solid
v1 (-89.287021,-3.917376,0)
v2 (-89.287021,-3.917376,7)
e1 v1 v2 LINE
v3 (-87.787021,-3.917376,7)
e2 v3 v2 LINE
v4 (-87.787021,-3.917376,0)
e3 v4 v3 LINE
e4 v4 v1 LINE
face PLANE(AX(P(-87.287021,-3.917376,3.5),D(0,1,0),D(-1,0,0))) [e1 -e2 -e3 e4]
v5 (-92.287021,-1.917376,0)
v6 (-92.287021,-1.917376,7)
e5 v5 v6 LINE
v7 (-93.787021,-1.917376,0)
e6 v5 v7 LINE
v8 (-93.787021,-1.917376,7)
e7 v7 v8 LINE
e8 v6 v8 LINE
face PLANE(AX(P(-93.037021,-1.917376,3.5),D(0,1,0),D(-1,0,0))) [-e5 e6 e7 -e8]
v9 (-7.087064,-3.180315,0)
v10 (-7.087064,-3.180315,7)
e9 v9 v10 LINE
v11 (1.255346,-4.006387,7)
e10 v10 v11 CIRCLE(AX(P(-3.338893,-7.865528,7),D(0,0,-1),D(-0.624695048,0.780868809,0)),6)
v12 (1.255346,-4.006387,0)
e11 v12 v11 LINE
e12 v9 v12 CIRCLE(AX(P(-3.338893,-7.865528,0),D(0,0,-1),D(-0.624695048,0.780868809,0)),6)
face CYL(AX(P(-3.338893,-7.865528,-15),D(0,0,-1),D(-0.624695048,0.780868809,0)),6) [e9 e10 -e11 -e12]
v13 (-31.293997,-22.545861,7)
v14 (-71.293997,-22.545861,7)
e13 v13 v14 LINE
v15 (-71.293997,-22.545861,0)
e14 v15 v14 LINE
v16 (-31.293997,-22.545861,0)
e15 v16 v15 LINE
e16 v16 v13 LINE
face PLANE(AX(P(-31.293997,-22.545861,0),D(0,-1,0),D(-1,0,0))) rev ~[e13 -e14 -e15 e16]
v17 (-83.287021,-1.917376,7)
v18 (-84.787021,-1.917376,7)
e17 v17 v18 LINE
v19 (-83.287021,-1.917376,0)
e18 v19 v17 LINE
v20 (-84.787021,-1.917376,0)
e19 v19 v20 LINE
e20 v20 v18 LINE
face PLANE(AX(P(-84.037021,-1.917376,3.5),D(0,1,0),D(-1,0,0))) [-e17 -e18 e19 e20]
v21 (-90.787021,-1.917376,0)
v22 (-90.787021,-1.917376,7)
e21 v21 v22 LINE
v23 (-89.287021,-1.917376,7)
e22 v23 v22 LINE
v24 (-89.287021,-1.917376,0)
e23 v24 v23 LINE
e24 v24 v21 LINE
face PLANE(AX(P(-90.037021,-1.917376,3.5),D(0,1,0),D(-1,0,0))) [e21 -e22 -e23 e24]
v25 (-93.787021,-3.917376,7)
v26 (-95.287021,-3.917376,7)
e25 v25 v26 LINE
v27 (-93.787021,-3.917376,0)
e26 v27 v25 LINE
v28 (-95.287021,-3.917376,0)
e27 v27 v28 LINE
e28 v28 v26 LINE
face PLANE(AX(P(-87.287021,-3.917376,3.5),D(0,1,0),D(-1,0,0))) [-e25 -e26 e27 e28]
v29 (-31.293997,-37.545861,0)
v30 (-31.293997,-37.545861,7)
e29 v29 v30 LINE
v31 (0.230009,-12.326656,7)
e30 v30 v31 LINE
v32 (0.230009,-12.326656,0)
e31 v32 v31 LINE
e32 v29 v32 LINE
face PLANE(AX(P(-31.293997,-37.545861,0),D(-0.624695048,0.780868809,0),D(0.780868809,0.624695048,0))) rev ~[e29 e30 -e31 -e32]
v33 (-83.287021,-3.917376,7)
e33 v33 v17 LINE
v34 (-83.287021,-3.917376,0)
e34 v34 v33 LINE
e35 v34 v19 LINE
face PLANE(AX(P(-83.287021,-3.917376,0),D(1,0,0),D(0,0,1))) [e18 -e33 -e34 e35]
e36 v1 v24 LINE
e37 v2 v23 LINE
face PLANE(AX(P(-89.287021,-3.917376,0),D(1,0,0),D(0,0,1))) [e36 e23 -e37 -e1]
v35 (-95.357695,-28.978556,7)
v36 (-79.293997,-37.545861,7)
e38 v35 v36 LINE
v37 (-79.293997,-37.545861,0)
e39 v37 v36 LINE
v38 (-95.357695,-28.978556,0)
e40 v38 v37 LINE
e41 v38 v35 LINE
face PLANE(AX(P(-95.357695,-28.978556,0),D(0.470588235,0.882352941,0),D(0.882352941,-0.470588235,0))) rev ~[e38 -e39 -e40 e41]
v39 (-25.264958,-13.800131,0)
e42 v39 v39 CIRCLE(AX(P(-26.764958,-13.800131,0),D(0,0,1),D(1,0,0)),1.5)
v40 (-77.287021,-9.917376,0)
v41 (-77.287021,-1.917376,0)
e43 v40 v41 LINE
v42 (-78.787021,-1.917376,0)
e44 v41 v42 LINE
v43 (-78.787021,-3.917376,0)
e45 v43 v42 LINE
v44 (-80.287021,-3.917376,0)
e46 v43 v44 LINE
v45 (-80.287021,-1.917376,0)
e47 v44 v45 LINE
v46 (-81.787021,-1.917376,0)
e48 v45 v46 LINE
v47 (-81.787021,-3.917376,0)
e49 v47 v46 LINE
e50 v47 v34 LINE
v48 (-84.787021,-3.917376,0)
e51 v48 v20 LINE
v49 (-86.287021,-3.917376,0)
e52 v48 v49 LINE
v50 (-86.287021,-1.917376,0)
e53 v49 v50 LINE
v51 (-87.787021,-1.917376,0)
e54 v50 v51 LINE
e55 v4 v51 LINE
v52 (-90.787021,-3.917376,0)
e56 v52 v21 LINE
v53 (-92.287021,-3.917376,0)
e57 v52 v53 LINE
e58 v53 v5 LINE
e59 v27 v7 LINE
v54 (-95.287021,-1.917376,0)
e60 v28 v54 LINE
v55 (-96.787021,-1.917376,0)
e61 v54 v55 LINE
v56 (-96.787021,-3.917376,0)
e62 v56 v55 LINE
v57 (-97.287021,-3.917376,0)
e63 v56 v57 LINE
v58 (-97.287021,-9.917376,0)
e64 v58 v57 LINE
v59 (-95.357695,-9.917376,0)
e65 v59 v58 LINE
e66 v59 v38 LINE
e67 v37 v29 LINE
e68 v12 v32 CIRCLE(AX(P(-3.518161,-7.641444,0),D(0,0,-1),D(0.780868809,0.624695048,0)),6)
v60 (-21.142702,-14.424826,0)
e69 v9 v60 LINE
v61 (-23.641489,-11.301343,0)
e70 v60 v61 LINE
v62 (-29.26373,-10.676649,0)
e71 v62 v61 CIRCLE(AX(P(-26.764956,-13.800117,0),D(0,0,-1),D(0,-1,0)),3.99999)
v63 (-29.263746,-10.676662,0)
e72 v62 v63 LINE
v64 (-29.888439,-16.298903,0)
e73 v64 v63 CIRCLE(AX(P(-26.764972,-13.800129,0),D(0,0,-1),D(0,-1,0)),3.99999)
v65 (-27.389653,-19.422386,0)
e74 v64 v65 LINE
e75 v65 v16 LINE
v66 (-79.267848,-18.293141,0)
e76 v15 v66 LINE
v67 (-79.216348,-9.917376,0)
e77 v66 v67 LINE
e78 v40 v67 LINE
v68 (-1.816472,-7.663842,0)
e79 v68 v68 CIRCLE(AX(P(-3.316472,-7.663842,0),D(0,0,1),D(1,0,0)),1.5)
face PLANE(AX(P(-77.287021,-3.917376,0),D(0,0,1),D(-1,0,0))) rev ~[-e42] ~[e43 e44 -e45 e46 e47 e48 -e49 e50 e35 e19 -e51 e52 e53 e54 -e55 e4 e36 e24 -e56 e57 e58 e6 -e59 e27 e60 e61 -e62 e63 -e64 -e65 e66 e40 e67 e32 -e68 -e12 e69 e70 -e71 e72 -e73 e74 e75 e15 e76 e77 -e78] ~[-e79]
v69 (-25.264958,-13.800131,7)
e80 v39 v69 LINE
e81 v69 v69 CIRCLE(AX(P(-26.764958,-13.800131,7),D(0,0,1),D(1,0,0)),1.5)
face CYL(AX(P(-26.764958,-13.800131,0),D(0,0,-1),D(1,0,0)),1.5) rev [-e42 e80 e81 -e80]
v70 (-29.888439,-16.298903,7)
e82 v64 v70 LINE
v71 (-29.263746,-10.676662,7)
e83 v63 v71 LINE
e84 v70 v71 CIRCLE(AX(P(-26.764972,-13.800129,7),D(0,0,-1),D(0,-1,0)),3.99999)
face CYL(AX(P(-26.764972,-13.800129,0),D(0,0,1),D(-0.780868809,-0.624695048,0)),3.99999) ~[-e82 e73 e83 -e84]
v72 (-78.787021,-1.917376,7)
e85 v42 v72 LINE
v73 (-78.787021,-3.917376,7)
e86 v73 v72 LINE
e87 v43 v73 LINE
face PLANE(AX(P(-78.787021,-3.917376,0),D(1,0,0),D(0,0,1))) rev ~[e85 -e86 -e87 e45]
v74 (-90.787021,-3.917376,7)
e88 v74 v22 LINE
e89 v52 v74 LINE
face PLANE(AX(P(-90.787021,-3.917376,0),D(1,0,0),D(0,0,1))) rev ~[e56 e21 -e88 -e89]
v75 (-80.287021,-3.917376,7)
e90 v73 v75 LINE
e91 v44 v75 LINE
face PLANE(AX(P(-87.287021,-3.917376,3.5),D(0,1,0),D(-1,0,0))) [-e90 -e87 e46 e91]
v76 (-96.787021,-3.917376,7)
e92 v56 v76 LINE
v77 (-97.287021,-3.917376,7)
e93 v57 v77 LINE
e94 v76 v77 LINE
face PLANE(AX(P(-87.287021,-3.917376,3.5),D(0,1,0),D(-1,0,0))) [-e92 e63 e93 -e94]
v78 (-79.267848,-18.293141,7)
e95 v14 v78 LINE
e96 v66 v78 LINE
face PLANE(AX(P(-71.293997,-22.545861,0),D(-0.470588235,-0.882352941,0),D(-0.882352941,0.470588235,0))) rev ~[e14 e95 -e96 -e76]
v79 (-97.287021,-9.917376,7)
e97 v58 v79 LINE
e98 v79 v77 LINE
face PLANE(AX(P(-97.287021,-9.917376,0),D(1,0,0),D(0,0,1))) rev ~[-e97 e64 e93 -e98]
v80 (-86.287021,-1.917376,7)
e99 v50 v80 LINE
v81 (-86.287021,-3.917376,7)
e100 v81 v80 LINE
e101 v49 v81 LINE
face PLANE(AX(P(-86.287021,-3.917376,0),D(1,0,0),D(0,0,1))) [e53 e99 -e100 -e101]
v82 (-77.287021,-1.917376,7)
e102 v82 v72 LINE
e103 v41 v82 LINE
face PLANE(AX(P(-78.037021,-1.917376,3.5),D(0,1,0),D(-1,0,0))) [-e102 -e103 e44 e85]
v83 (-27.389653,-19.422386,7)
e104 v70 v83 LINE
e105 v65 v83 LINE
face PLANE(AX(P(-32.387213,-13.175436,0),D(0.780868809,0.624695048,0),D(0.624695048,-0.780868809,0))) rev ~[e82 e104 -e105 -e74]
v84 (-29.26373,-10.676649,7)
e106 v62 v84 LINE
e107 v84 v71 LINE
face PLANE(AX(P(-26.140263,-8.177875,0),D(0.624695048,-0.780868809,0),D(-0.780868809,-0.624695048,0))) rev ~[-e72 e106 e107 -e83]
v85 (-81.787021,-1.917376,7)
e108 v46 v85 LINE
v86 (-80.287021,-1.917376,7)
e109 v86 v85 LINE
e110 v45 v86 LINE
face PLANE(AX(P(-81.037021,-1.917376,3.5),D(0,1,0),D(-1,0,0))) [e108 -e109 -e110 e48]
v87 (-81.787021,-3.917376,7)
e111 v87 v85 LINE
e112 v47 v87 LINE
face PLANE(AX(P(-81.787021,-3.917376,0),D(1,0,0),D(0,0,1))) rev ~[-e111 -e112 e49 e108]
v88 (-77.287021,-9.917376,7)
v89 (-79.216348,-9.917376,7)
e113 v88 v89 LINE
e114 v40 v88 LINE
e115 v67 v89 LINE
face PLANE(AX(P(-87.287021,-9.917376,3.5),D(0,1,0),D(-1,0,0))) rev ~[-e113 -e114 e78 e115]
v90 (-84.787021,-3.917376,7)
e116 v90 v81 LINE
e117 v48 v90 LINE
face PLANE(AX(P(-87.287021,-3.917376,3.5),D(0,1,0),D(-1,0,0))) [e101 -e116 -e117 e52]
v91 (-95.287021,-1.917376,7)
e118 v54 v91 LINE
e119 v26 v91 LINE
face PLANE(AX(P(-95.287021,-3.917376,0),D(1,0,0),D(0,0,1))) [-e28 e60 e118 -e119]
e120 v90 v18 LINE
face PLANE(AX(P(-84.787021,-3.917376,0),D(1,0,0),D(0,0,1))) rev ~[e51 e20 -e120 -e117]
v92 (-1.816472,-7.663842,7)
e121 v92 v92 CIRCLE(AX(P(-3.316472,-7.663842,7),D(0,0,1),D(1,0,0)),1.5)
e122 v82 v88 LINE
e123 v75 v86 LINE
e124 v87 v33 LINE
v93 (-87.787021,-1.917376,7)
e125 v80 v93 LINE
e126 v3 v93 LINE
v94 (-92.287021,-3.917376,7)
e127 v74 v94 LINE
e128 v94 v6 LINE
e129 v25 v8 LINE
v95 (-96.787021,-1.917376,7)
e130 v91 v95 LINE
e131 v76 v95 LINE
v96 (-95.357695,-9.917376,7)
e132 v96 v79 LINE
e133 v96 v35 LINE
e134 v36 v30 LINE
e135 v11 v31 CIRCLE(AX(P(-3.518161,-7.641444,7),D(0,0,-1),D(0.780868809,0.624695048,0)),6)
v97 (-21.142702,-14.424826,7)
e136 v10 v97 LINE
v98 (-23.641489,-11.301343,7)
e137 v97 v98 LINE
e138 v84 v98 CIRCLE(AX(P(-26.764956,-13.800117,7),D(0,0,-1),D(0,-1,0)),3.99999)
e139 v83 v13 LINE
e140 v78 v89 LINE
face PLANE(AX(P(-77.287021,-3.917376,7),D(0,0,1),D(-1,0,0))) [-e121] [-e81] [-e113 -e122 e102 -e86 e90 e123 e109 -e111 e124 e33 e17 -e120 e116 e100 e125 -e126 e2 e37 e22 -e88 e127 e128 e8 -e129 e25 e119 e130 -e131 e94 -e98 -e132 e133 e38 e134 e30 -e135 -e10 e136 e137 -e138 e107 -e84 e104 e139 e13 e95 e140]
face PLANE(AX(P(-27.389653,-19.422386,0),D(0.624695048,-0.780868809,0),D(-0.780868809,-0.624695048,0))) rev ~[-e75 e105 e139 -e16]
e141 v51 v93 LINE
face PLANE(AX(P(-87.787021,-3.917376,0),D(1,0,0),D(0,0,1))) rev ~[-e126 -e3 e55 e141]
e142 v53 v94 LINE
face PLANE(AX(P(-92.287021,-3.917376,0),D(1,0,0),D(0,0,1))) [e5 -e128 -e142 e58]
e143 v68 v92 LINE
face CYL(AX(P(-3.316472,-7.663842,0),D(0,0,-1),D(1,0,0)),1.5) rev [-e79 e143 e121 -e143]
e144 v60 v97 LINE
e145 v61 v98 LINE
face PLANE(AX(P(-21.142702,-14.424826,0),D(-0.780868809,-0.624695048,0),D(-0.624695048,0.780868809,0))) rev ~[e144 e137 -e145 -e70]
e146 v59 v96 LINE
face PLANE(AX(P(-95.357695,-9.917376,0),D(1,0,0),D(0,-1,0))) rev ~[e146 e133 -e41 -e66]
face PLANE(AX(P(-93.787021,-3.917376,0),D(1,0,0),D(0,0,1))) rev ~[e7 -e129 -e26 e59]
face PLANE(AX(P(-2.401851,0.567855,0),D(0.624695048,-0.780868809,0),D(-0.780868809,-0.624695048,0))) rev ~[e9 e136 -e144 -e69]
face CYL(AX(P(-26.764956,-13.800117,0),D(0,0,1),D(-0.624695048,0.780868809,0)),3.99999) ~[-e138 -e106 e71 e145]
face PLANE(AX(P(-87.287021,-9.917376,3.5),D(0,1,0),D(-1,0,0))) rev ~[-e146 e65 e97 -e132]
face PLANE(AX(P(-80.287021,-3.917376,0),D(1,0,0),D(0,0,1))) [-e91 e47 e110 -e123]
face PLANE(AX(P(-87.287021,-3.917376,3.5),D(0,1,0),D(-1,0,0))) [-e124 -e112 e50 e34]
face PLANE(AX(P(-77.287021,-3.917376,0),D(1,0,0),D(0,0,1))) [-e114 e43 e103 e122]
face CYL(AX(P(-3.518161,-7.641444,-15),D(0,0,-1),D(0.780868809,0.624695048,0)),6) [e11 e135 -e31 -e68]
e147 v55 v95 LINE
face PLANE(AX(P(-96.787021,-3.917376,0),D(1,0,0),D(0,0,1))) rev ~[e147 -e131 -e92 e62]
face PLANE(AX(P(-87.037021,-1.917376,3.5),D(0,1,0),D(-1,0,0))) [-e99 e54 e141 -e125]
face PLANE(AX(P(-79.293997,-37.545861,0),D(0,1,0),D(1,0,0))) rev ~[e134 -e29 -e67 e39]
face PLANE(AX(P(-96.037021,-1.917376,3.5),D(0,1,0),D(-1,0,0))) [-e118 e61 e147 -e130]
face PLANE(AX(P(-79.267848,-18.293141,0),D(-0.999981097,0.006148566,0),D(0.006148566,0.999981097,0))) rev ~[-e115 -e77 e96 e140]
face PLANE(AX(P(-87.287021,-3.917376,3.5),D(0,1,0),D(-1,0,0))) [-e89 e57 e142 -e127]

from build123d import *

# Parameters (mm, degrees)
F0_R        = 1.5
F1_DEPTH    = 7
F2_R        = 3.99999
F3_T1_DEPTH = 37
F4_W        = 20
F4_H        = 7
F5_DEPTH    = 6
F6_W        = 1.5
F6_H        = 7
F7_DEPTH    = 2


# Not quite as in the source:
# - a fillet or chamfer that OpenCascade refuses, or shapes differently, is made with other operations: its cross-section is extruded or revolved along the edge and cut away or added
# - a fillet or chamfer is up to 0.001 mm smaller than in the source, because OpenCascade refuses the exact size


with BuildPart() as f1:
    # F0 (on Top) → F1 (new body)
    with BuildSketch(Plane.XY):
        Polygon((-79.2163482308, -9.9173756316), (-95.3576945582, -9.9173756316), (-95.3576945582, -28.9785558952), (-79.2939967774, -37.5458613783), (-31.2939967774, -37.5458613783), (4.9152223427, -8.5784860822), (-2.401850828, 0.5678553812), (-21.1427022546, -14.4248257601), (-26.1402626351, -8.1778752846), (-32.3872131106, -13.175435665), (-27.3896527302, -19.4223861405), (-31.2939967774, -22.5458613783), (-71.2939967774, -22.5458613783), (-79.2678481488, -18.2931406469), align=None)
        with Locations((-26.7649576826, -13.8001307126)):
            Circle(F0_R, mode=Mode.SUBTRACT)
        with Locations((-3.3164724251, -7.6638418965)):
            Circle(F0_R, mode=Mode.SUBTRACT)
    extrude(amount=F1_DEPTH)

    # F2 (radius 4 in the source; OpenCascade refuses exactly that, so slightly less here)
    f2_edges = [f1.edges().sort_by_distance(p)[0] for p in [
        (-26.140263, -8.177875, 3.5),
        (-32.387213, -13.175436, 3.5),
    ]]
    fillet(f2_edges, radius=F2_R)

    # F3: fillet of radius 6 on 2 edges, made by hand

    # F3_s2 → F3_t1 (cut)
    with BuildSketch(Plane.XY.offset(-15)):
        with BuildLine():
            ThreePointArc((-7.0870636847, -3.1803149041), (-2.6763042429, -1.9022253527), (1.3463194573, -4.1173574755))
            Line((1.3463194573, -4.1173574755), (-2.401850828, 0.5678553812))
            Line((-2.401850828, 0.5678553812), (-7.0870636847, -3.1803149041))
        make_face()
        with BuildLine():
            ThreePointArc((1.1670520574, -3.8932732256), (2.4451416088, -8.3040326673), (0.2300094861, -12.3266563675))
            Line((0.2300094861, -12.3266563675), (4.9152223427, -8.5784860822))
            Line((4.9152223427, -8.5784860822), (1.1670520574, -3.8932732256))
        make_face()
    extrude(amount=F3_T1_DEPTH, mode=Mode.SUBTRACT)

    # F4 (on face) → F5 (join)
    with BuildSketch(Plane(origin=(0, -9.9173756316, 0), x_dir=(-1, 0, 0), z_dir=(0, 1, 0))):
        with Locations((87.2870213945, 3.5)):
            Rectangle(F4_W, F4_H)
    extrude(amount=F5_DEPTH)

    # F6 (on face) → F7 (join)
    with BuildSketch(Plane(origin=(0, -3.9173756316, 0), x_dir=(-1, 0, 0), z_dir=(0, 1, 0))):
        with Locations((78.0370213945, 3.5)):
            Rectangle(F6_W, F6_H)
        with Locations((81.0370213945, 3.5)):
            Rectangle(F6_W, F6_H)
        with Locations((84.0370213945, 3.5)):
            Rectangle(F6_W, F6_H)
        with Locations((87.0370213945, 3.5)):
            Rectangle(F6_W, F6_H)
        with Locations((90.0370213945, 3.5)):
            Rectangle(F6_W, F6_H)
        with Locations((93.0370213945, 3.5)):
            Rectangle(F6_W, F6_H)
        with Locations((96.0370213945, 3.5)):
            Rectangle(F6_W, F6_H)
    extrude(amount=F7_DEPTH)


solid = f1.part
